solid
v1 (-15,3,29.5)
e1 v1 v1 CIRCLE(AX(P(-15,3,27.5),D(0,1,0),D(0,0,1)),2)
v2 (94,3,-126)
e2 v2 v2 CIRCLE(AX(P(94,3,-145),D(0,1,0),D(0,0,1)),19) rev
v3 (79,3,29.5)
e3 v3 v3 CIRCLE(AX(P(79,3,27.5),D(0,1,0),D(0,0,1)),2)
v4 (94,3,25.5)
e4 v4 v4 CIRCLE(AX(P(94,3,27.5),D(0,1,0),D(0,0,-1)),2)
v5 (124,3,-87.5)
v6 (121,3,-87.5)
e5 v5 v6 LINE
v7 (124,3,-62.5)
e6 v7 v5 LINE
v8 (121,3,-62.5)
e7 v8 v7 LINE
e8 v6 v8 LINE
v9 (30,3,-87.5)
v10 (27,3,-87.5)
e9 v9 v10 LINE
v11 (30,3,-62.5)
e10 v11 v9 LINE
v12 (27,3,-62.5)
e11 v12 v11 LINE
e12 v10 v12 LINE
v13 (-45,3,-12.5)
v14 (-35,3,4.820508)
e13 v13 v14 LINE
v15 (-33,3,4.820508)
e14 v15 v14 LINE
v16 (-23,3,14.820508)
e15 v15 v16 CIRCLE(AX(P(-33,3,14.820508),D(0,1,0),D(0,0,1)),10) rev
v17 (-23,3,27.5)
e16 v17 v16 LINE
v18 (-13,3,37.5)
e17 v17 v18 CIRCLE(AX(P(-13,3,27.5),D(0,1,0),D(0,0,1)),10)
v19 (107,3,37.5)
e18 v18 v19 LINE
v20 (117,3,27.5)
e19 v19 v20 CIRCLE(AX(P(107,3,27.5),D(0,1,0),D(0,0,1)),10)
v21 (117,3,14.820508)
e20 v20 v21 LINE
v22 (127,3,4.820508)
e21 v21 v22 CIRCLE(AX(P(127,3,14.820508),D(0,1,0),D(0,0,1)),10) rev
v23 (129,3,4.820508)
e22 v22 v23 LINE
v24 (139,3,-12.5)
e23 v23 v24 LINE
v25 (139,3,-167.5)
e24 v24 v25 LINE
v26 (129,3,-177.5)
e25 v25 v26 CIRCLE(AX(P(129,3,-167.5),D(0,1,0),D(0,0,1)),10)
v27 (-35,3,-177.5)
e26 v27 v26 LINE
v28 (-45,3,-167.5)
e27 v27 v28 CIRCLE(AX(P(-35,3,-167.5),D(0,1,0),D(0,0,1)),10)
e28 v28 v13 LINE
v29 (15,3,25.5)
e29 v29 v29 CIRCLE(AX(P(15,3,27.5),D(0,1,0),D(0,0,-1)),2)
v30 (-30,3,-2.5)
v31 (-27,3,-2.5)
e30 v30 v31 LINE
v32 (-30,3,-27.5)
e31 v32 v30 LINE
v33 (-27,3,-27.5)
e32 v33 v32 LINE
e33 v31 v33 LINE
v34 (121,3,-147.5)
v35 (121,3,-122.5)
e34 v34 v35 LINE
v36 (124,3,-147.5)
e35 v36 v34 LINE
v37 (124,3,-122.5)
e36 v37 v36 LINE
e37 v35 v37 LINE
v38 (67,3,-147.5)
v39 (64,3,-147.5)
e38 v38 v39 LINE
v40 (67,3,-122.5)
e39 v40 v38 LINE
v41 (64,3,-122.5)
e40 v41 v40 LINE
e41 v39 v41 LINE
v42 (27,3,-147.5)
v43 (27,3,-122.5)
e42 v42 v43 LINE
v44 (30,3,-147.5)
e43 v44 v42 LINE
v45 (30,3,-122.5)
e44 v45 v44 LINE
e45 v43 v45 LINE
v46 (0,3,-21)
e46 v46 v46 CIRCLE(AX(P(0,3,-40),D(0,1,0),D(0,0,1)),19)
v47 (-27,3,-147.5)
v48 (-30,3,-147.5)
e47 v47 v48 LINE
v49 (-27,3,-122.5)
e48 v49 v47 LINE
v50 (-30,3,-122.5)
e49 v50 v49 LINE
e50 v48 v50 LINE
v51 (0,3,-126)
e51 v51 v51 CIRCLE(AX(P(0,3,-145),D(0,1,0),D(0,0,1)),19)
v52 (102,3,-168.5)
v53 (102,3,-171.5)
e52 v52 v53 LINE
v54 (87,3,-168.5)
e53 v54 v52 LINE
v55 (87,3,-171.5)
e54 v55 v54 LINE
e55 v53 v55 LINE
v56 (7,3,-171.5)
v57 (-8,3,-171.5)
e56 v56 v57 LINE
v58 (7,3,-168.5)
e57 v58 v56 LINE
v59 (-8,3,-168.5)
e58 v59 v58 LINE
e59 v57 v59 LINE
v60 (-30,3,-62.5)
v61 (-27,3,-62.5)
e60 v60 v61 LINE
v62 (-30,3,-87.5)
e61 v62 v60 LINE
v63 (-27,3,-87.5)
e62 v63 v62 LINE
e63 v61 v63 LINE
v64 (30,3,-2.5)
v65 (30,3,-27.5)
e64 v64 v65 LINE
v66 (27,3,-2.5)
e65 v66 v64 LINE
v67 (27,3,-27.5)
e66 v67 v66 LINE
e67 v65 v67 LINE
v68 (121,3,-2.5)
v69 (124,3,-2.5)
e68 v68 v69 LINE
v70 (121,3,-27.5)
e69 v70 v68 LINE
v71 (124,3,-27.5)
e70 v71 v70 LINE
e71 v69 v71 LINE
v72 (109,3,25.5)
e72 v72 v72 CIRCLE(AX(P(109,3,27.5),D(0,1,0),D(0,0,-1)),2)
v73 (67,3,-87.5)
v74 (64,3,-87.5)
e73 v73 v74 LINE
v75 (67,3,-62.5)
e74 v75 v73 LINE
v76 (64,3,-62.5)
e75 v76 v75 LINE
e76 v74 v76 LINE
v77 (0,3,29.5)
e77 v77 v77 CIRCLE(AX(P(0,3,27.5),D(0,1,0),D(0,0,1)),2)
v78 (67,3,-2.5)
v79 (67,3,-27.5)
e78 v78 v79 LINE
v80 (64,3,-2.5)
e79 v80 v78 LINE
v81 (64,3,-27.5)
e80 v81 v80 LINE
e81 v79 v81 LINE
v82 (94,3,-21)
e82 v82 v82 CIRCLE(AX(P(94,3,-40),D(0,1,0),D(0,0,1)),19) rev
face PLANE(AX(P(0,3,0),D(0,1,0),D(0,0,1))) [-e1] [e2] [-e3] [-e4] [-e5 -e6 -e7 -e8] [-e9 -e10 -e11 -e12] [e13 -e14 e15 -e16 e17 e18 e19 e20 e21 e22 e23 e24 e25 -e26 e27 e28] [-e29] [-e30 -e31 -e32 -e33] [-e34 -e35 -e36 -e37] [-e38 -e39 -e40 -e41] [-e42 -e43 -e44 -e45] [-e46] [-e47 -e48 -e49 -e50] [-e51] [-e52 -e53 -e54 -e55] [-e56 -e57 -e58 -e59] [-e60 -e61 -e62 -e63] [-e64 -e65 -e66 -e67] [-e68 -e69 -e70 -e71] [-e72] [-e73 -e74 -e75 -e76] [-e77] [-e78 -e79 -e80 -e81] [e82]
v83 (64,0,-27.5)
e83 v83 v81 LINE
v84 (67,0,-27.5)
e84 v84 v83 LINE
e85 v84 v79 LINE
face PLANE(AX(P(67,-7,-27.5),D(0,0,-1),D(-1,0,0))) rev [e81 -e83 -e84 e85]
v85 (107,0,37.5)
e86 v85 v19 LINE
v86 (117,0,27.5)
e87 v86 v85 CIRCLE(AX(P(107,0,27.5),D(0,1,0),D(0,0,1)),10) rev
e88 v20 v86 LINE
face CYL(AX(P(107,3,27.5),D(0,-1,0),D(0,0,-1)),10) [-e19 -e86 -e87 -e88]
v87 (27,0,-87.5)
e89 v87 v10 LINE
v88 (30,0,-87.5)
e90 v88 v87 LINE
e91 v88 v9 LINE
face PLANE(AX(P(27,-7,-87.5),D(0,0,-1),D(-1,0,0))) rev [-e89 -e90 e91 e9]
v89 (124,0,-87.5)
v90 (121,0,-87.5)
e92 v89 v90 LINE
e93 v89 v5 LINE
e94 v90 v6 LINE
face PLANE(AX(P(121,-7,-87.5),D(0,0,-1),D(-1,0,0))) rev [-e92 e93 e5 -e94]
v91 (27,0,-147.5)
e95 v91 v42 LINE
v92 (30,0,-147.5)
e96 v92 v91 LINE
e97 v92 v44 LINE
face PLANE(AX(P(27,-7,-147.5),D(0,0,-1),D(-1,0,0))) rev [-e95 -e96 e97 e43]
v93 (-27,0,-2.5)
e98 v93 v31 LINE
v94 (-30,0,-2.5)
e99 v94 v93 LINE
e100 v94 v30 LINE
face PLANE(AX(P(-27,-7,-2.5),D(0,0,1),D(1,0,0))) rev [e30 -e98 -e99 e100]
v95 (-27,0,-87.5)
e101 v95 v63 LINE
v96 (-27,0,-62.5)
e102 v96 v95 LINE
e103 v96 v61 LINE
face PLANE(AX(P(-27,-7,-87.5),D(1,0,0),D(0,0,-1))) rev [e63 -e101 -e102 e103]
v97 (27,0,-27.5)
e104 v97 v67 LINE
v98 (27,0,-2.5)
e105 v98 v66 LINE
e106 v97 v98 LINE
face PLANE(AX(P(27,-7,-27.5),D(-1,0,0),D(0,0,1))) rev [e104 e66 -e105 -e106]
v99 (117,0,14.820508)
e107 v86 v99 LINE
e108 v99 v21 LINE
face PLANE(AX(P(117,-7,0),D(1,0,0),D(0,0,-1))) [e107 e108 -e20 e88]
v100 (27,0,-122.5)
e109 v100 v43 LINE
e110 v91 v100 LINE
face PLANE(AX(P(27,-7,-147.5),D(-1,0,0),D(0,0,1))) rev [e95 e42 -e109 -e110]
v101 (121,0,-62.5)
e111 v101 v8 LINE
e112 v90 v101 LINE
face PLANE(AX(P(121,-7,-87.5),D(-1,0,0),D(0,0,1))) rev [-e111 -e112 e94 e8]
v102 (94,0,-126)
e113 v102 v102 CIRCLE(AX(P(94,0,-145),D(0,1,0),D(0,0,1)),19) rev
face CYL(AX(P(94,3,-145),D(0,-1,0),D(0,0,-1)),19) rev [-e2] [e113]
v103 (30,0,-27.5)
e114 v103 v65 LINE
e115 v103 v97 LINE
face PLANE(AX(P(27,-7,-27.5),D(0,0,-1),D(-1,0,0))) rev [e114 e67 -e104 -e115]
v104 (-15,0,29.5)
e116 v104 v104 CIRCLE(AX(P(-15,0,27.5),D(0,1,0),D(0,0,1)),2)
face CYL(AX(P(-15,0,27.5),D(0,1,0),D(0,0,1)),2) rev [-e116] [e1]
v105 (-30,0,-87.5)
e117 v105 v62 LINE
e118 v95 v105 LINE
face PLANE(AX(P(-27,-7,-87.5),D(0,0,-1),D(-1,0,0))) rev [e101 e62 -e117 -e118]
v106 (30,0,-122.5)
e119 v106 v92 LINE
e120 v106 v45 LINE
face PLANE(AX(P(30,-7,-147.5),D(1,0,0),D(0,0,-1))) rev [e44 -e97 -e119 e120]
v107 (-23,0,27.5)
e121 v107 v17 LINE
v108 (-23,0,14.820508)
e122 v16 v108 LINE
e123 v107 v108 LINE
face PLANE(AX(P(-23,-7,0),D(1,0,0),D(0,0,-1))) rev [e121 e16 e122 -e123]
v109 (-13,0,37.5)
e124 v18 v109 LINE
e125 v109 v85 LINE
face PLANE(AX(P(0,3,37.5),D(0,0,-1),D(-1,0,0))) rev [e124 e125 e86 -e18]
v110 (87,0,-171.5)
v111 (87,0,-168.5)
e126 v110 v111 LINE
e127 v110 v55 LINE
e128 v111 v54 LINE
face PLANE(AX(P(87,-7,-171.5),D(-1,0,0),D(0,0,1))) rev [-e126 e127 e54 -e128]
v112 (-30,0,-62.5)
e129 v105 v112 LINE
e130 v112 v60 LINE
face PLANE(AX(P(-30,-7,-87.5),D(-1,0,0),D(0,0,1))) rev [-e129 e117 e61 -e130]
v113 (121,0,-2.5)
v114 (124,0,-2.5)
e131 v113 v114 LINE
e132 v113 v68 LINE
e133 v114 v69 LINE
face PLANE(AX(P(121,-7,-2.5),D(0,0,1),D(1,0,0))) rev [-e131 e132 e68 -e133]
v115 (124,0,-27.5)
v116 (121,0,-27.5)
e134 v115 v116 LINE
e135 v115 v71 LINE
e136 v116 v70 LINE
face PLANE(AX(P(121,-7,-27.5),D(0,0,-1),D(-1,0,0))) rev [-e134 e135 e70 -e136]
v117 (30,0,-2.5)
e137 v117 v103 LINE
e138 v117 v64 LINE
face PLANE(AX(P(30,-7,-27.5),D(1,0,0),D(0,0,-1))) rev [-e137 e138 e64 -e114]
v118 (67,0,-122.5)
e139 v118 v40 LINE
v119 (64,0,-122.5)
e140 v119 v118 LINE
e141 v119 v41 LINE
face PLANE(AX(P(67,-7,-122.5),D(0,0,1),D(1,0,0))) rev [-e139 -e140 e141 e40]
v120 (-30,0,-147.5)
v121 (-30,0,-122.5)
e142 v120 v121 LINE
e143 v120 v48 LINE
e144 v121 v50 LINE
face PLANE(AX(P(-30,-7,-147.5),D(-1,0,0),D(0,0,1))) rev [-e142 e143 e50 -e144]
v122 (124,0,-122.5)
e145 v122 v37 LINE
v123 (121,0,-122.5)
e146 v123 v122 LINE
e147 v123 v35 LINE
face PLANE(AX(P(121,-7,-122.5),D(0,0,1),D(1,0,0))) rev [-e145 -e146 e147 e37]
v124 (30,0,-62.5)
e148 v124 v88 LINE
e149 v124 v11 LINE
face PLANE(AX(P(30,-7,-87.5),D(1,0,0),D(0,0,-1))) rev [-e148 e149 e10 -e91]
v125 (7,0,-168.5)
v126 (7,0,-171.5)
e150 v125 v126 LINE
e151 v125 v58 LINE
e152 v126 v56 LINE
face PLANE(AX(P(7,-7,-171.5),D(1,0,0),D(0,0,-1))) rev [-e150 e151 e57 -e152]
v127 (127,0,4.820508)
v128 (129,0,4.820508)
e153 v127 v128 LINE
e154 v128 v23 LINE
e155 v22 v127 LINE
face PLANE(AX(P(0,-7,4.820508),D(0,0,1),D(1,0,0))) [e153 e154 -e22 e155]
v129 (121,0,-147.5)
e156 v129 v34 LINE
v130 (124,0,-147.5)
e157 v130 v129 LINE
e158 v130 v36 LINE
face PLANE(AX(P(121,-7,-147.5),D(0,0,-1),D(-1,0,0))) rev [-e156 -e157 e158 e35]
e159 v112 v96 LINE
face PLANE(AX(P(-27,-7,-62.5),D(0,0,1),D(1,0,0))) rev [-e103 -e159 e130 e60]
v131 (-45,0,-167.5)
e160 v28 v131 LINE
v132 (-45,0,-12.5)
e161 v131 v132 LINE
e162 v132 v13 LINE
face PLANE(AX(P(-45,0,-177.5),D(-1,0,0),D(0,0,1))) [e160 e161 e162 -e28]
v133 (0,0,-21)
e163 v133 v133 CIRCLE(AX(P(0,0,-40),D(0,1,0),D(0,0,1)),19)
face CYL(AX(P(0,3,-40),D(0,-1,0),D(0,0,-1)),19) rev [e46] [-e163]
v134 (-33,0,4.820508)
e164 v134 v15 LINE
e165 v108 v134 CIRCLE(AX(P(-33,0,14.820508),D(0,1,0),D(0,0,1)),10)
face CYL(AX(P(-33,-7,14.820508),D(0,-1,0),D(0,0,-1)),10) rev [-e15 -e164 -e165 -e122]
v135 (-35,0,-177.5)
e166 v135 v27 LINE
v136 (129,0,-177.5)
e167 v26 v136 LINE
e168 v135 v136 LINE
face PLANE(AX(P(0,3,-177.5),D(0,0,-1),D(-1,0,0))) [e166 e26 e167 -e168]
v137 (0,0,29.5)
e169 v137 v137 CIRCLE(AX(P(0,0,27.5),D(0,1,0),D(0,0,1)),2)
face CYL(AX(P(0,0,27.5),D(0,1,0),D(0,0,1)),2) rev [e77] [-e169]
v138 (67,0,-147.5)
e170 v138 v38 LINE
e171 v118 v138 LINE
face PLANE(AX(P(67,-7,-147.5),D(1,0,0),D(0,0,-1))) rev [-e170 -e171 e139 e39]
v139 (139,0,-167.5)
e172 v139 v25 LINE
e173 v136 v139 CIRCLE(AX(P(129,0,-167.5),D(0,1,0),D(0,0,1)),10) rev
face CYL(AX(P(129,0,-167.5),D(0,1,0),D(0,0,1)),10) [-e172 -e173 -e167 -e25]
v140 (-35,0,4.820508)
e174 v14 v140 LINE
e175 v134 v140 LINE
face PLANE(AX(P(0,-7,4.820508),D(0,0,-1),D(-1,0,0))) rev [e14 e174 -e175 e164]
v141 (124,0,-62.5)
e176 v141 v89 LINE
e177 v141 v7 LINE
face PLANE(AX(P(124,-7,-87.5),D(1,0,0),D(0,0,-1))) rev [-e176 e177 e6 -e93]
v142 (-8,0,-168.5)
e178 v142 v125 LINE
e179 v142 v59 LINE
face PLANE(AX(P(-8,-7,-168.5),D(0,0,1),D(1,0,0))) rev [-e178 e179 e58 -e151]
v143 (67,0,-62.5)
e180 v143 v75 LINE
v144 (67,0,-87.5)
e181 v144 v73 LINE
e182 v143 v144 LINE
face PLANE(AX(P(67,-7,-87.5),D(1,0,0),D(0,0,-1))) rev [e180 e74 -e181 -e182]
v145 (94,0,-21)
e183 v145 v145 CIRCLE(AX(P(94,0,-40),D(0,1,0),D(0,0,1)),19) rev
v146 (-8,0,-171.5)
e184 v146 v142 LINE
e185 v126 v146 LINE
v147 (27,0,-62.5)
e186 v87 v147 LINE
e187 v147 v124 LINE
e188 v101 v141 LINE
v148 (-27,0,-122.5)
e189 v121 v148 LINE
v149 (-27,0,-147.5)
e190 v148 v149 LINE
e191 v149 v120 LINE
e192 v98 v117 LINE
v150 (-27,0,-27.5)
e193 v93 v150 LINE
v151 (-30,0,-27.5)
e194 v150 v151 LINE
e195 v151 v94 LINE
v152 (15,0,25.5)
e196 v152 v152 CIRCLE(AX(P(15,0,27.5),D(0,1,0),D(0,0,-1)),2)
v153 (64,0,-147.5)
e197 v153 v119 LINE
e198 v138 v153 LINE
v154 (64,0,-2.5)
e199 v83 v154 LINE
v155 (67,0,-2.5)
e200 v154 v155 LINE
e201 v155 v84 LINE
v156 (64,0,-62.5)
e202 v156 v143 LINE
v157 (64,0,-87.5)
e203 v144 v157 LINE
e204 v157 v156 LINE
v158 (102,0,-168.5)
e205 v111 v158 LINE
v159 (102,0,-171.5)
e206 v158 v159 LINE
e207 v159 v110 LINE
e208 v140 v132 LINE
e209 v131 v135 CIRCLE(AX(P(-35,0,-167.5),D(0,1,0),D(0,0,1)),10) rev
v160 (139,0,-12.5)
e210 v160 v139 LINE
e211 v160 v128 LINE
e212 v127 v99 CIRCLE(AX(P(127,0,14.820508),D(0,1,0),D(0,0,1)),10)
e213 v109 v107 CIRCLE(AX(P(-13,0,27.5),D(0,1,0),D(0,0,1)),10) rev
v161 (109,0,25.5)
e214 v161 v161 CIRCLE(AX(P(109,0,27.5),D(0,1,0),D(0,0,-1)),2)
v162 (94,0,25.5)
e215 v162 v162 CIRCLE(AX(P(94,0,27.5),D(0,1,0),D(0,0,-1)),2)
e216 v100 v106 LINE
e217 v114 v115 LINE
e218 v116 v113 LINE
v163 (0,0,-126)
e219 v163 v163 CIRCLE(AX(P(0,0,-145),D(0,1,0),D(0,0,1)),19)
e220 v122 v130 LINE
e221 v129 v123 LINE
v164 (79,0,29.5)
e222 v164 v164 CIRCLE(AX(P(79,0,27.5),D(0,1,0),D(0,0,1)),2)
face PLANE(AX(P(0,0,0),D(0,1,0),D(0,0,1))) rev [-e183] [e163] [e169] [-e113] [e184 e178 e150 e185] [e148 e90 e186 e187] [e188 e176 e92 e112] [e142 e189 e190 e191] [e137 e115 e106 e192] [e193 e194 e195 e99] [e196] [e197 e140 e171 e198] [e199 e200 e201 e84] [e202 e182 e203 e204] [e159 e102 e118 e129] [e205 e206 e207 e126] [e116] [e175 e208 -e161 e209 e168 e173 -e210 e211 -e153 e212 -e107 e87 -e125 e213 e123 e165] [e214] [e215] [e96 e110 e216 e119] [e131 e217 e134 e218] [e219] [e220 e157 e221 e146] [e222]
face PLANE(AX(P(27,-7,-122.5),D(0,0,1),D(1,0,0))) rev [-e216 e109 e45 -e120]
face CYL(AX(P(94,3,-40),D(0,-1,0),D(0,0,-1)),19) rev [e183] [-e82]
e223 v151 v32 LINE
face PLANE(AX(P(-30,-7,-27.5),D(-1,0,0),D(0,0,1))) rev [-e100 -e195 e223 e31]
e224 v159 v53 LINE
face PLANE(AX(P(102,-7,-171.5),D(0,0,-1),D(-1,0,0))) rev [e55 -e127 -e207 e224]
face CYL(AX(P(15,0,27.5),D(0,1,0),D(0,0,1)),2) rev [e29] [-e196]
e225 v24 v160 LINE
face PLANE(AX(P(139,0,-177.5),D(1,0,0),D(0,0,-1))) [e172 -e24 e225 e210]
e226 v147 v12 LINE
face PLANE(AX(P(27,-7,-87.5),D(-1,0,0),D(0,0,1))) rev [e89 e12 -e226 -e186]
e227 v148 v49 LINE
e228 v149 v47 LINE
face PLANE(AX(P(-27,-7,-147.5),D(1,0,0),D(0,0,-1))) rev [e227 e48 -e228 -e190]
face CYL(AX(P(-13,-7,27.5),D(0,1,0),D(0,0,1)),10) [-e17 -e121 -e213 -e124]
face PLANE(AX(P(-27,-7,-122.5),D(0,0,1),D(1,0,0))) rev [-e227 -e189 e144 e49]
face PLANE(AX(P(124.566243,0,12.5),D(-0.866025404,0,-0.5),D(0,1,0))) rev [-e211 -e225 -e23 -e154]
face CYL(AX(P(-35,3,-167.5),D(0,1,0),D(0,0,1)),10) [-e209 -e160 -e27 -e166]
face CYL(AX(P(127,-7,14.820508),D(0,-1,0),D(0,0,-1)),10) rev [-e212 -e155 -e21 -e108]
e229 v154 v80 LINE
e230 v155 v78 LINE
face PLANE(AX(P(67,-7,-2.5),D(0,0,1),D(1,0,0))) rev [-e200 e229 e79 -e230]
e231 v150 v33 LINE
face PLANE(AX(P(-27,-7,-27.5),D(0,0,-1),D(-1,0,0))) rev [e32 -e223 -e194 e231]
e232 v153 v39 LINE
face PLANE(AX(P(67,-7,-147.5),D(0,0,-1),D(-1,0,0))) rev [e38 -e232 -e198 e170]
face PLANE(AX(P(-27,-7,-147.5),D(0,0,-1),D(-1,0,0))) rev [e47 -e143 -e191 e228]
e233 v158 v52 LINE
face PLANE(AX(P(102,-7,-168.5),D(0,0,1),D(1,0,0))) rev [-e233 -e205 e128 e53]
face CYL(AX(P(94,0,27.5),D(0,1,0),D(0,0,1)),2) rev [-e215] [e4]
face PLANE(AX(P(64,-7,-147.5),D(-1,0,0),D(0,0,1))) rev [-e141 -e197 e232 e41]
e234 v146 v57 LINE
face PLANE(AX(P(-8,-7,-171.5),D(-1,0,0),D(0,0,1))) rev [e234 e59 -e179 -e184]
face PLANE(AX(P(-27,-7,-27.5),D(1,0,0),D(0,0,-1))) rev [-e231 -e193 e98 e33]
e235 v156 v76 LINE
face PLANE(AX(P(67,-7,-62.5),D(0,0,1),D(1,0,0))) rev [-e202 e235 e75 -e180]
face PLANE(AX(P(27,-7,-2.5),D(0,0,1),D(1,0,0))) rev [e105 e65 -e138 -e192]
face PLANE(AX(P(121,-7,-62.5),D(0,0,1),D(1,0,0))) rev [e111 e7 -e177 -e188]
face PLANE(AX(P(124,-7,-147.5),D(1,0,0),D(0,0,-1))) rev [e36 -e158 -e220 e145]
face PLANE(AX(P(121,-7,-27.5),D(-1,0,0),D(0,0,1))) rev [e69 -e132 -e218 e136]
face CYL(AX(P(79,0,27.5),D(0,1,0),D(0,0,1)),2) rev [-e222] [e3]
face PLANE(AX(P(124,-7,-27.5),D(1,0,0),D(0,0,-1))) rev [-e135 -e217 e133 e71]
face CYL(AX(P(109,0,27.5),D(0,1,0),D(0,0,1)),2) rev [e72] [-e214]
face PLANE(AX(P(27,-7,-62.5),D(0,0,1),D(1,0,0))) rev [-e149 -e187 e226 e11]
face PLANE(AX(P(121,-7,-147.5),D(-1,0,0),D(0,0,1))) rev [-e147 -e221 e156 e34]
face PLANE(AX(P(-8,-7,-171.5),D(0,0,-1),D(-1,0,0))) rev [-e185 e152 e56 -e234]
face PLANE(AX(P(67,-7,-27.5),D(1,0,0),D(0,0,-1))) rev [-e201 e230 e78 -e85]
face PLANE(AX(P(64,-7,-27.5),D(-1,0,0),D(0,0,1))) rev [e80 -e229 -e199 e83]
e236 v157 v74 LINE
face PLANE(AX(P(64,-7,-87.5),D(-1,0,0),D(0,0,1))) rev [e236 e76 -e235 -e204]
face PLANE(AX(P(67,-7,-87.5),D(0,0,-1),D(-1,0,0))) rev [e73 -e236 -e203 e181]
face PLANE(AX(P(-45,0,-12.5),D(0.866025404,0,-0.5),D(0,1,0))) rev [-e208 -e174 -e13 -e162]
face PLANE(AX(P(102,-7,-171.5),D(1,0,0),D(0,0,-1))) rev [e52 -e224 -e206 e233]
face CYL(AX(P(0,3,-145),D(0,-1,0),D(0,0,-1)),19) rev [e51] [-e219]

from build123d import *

# Parameters (mm, degrees)
SKETCH_1_W          = 164
SKETCH_1_H          = 215
SKETCH_1_R          = 19
EXTRUDE_1_DEPTH     = 3
SKETCH_2_R          = 2
CUT_EXTRUDE_1_DEPTH = 3
SKETCH_3_W          = 3
SKETCH_3_H          = 25
CUT_EXTRUDE_2_DEPTH = 10
SKETCH_4_W          = 15
SKETCH_4_H          = 3
CUT_EXTRUDE_3_DEPTH = 10
SKETCH_6_W          = 10
SKETCH_6_H          = 190
EXTRUDE_2_DEPTH     = 3
CHAMFER_1_SIZE      = 25
CHAMFER_1_SIZE_2    = 14.43375673
FILLET_4_R          = 10
SKETCH_7_W          = 20
SKETCH_7_H          = 32.679491924
CUT_EXTRUDE_4_DEPTH = 10
FILLET_5_R          = 10
FILLET_6_R          = 10


with BuildPart() as part:
    # 草图1 → 凸台-拉伸1 (new body)
    with BuildSketch(Plane(origin=(0, 0, 0), x_dir=(1, 0, 0), z_dir=(0, 1, 0))):
        with Locations((47, 70)):
            Rectangle(SKETCH_1_W, SKETCH_1_H)
        with Locations(Location((94, 40, 0), (0, 0, 270))):
            Circle(SKETCH_1_R, mode=Mode.SUBTRACT)
        with Locations(Location((0, 40, 0), (0, 0, 270))):
            Circle(SKETCH_1_R, mode=Mode.SUBTRACT)
        with Locations(Location((0, 145, 0), (0, 0, 270))):
            Circle(SKETCH_1_R, mode=Mode.SUBTRACT)
        with Locations(Location((94, 145, 0), (0, 0, 270))):
            Circle(SKETCH_1_R, mode=Mode.SUBTRACT)
    extrude(amount=EXTRUDE_1_DEPTH)

    # 草图2 → 切除-拉伸1 (cut)
    with BuildSketch(Plane(origin=(0, 3, 0), x_dir=(1, 0, 0), z_dir=(0, 1, 0))):
        with Locations(Location((0, -27.5, 0), (0, 0, 270))):
            Circle(SKETCH_2_R)
        with Locations(Location((-15, -27.5, 0), (0, 0, 270))):
            Circle(SKETCH_2_R)
        with Locations(Location((15, -27.5, 0), (0, 0, 90))):
            Circle(SKETCH_2_R)
        with Locations(Location((79, -27.5, 0), (0, 0, 270))):
            Circle(SKETCH_2_R)
        with Locations(Location((109, -27.5, 0), (0, 0, 90))):
            Circle(SKETCH_2_R)
        with Locations(Location((94, -27.5, 0), (0, 0, 90))):
            Circle(SKETCH_2_R)
    extrude(amount=-CUT_EXTRUDE_1_DEPTH, mode=Mode.SUBTRACT)

    # 草图3 → 切除-拉伸2 (cut)
    with BuildSketch(Plane(origin=(0, 3, 0), x_dir=(1, 0, 0), z_dir=(0, 1, 0))):
        with Locations((28.5, 135)):
            Rectangle(SKETCH_3_W, SKETCH_3_H)
        with Locations((65.5, 135)):
            Rectangle(SKETCH_3_W, SKETCH_3_H)
        with Locations((28.5, 75)):
            Rectangle(SKETCH_3_W, SKETCH_3_H)
        with Locations((65.5, 75)):
            Rectangle(SKETCH_3_W, SKETCH_3_H)
        with Locations((28.5, 15)):
            Rectangle(SKETCH_3_W, SKETCH_3_H)
        with Locations((65.5, 15)):
            Rectangle(SKETCH_3_W, SKETCH_3_H)
        with Locations((-28.5, 15)):
            Rectangle(SKETCH_3_W, SKETCH_3_H)
        with Locations((-28.5, 75)):
            Rectangle(SKETCH_3_W, SKETCH_3_H)
        with Locations((-28.5, 135)):
            Rectangle(SKETCH_3_W, SKETCH_3_H)
        with Locations((122.5, 135)):
            Rectangle(SKETCH_3_W, SKETCH_3_H)
        with Locations((122.5, 75)):
            Rectangle(SKETCH_3_W, SKETCH_3_H)
        with Locations((122.5, 15)):
            Rectangle(SKETCH_3_W, SKETCH_3_H)
    extrude(amount=-CUT_EXTRUDE_2_DEPTH, mode=Mode.SUBTRACT)

    # 草图4 → 切除-拉伸3 (cut)
    with BuildSketch(Plane(origin=(0, 3, 0), x_dir=(1, 0, 0), z_dir=(0, 1, 0))):
        with Locations((-0.5, 170)):
            Rectangle(SKETCH_4_W, SKETCH_4_H)
        with Locations((94.5, 170)):
            Rectangle(SKETCH_4_W, SKETCH_4_H)
    extrude(amount=-CUT_EXTRUDE_3_DEPTH, mode=Mode.SUBTRACT)

    # 草图6 → 凸台-拉伸2 (add)
    with BuildSketch(Plane(origin=(0, 3, 0), x_dir=(1, 0, 0), z_dir=(0, 1, 0))):
        with Locations((-40, 82.5)):
            Rectangle(SKETCH_6_W, SKETCH_6_H)
        with Locations((134, 82.5)):
            Rectangle(SKETCH_6_W, SKETCH_6_H)
    extrude(amount=-EXTRUDE_2_DEPTH)

    # 倒角1
    # the kernel refuses this chamfer: 25, 14.43375673 mm, written as the material it takes off along each edge
    with BuildSketch(Plane(origin=(139, 67.677143866, 12.5), x_dir=(0.019326765612700705, 0, -0.9998132206222079), z_dir=(0, -1, 0))) as chamfer_1_piece_1_section:
        Polygon((CHAMFER_1_SIZE * 0.999813220622, -CHAMFER_1_SIZE * 0.0193267656127), (-CHAMFER_1_SIZE_2 * 0.0193267656124, -CHAMFER_1_SIZE_2 * 0.999813220604), (0, 0), align=None)
    chamfer_1_piece_1 = extrude(amount=132.354287732, mode=Mode.PRIVATE)
    chamfer_1_piece_1 = split(chamfer_1_piece_1, bisect_by=Plane(origin=(129, 1.5, 3.344472452), z_dir=(1, 0, 0)), keep=Keep.TOP, mode=Mode.PRIVATE)
    add(chamfer_1_piece_1, mode=Mode.SUBTRACT)
    with BuildSketch(Plane(origin=(-45, 67.677143866, 12.5), x_dir=(0.9983227437537926, 0, 0.057893862402670776), z_dir=(0, -1, 0))) as chamfer_1_piece_2_section:
        Polygon((CHAMFER_1_SIZE_2 * 0.998322743736, -CHAMFER_1_SIZE_2 * 0.0578938624016), (-CHAMFER_1_SIZE * 0.0578938624027, -CHAMFER_1_SIZE * 0.998322743754), (0, 0), align=None)
    chamfer_1_piece_2 = extrude(amount=132.354287732, mode=Mode.PRIVATE)
    chamfer_1_piece_2 = split(chamfer_1_piece_2, bisect_by=Plane(origin=(-35, 1.5, 3.344472452), z_dir=(-1, 0, 0)), keep=Keep.TOP, mode=Mode.PRIVATE)
    add(chamfer_1_piece_2, mode=Mode.SUBTRACT)

    # 圆角4
    fillet_4_edges = [part.edges().sort_by_distance(p)[0] for p in [
        (-35, 1.5, 37.5),
        (129, 1.5, 37.5),
        (-45, 1.5, -177.5),
        (139, 1.5, -177.5),
    ]]
    fillet(fillet_4_edges, radius=FILLET_4_R)

    # 草图7 → 切除-拉伸4 (cut)
    with BuildSketch(Plane(origin=(0, 3, 0), x_dir=(1, 0, 0), z_dir=(0, 1, 0))):
        with Locations((-33, -21.160254038)):
            Rectangle(SKETCH_7_W, SKETCH_7_H)
        with Locations((127, -21.160254038)):
            Rectangle(SKETCH_7_W, SKETCH_7_H)
    extrude(amount=-CUT_EXTRUDE_4_DEPTH, mode=Mode.SUBTRACT)

    # 圆角5
    fillet_5_edges = [part.edges().sort_by_distance(p)[0] for p in [
        (-23, 1.5, 37.5),
        (117, 1.5, 37.5),
    ]]
    fillet(fillet_5_edges, radius=FILLET_5_R)

    # 圆角6
    fillet_6_edges = [part.edges().sort_by_distance(p)[0] for p in [
        (-23, 1.5, 4.820508076),
        (117, 1.5, 4.820508076),
    ]]
    fillet(fillet_6_edges, radius=FILLET_6_R)


solid = part.part
